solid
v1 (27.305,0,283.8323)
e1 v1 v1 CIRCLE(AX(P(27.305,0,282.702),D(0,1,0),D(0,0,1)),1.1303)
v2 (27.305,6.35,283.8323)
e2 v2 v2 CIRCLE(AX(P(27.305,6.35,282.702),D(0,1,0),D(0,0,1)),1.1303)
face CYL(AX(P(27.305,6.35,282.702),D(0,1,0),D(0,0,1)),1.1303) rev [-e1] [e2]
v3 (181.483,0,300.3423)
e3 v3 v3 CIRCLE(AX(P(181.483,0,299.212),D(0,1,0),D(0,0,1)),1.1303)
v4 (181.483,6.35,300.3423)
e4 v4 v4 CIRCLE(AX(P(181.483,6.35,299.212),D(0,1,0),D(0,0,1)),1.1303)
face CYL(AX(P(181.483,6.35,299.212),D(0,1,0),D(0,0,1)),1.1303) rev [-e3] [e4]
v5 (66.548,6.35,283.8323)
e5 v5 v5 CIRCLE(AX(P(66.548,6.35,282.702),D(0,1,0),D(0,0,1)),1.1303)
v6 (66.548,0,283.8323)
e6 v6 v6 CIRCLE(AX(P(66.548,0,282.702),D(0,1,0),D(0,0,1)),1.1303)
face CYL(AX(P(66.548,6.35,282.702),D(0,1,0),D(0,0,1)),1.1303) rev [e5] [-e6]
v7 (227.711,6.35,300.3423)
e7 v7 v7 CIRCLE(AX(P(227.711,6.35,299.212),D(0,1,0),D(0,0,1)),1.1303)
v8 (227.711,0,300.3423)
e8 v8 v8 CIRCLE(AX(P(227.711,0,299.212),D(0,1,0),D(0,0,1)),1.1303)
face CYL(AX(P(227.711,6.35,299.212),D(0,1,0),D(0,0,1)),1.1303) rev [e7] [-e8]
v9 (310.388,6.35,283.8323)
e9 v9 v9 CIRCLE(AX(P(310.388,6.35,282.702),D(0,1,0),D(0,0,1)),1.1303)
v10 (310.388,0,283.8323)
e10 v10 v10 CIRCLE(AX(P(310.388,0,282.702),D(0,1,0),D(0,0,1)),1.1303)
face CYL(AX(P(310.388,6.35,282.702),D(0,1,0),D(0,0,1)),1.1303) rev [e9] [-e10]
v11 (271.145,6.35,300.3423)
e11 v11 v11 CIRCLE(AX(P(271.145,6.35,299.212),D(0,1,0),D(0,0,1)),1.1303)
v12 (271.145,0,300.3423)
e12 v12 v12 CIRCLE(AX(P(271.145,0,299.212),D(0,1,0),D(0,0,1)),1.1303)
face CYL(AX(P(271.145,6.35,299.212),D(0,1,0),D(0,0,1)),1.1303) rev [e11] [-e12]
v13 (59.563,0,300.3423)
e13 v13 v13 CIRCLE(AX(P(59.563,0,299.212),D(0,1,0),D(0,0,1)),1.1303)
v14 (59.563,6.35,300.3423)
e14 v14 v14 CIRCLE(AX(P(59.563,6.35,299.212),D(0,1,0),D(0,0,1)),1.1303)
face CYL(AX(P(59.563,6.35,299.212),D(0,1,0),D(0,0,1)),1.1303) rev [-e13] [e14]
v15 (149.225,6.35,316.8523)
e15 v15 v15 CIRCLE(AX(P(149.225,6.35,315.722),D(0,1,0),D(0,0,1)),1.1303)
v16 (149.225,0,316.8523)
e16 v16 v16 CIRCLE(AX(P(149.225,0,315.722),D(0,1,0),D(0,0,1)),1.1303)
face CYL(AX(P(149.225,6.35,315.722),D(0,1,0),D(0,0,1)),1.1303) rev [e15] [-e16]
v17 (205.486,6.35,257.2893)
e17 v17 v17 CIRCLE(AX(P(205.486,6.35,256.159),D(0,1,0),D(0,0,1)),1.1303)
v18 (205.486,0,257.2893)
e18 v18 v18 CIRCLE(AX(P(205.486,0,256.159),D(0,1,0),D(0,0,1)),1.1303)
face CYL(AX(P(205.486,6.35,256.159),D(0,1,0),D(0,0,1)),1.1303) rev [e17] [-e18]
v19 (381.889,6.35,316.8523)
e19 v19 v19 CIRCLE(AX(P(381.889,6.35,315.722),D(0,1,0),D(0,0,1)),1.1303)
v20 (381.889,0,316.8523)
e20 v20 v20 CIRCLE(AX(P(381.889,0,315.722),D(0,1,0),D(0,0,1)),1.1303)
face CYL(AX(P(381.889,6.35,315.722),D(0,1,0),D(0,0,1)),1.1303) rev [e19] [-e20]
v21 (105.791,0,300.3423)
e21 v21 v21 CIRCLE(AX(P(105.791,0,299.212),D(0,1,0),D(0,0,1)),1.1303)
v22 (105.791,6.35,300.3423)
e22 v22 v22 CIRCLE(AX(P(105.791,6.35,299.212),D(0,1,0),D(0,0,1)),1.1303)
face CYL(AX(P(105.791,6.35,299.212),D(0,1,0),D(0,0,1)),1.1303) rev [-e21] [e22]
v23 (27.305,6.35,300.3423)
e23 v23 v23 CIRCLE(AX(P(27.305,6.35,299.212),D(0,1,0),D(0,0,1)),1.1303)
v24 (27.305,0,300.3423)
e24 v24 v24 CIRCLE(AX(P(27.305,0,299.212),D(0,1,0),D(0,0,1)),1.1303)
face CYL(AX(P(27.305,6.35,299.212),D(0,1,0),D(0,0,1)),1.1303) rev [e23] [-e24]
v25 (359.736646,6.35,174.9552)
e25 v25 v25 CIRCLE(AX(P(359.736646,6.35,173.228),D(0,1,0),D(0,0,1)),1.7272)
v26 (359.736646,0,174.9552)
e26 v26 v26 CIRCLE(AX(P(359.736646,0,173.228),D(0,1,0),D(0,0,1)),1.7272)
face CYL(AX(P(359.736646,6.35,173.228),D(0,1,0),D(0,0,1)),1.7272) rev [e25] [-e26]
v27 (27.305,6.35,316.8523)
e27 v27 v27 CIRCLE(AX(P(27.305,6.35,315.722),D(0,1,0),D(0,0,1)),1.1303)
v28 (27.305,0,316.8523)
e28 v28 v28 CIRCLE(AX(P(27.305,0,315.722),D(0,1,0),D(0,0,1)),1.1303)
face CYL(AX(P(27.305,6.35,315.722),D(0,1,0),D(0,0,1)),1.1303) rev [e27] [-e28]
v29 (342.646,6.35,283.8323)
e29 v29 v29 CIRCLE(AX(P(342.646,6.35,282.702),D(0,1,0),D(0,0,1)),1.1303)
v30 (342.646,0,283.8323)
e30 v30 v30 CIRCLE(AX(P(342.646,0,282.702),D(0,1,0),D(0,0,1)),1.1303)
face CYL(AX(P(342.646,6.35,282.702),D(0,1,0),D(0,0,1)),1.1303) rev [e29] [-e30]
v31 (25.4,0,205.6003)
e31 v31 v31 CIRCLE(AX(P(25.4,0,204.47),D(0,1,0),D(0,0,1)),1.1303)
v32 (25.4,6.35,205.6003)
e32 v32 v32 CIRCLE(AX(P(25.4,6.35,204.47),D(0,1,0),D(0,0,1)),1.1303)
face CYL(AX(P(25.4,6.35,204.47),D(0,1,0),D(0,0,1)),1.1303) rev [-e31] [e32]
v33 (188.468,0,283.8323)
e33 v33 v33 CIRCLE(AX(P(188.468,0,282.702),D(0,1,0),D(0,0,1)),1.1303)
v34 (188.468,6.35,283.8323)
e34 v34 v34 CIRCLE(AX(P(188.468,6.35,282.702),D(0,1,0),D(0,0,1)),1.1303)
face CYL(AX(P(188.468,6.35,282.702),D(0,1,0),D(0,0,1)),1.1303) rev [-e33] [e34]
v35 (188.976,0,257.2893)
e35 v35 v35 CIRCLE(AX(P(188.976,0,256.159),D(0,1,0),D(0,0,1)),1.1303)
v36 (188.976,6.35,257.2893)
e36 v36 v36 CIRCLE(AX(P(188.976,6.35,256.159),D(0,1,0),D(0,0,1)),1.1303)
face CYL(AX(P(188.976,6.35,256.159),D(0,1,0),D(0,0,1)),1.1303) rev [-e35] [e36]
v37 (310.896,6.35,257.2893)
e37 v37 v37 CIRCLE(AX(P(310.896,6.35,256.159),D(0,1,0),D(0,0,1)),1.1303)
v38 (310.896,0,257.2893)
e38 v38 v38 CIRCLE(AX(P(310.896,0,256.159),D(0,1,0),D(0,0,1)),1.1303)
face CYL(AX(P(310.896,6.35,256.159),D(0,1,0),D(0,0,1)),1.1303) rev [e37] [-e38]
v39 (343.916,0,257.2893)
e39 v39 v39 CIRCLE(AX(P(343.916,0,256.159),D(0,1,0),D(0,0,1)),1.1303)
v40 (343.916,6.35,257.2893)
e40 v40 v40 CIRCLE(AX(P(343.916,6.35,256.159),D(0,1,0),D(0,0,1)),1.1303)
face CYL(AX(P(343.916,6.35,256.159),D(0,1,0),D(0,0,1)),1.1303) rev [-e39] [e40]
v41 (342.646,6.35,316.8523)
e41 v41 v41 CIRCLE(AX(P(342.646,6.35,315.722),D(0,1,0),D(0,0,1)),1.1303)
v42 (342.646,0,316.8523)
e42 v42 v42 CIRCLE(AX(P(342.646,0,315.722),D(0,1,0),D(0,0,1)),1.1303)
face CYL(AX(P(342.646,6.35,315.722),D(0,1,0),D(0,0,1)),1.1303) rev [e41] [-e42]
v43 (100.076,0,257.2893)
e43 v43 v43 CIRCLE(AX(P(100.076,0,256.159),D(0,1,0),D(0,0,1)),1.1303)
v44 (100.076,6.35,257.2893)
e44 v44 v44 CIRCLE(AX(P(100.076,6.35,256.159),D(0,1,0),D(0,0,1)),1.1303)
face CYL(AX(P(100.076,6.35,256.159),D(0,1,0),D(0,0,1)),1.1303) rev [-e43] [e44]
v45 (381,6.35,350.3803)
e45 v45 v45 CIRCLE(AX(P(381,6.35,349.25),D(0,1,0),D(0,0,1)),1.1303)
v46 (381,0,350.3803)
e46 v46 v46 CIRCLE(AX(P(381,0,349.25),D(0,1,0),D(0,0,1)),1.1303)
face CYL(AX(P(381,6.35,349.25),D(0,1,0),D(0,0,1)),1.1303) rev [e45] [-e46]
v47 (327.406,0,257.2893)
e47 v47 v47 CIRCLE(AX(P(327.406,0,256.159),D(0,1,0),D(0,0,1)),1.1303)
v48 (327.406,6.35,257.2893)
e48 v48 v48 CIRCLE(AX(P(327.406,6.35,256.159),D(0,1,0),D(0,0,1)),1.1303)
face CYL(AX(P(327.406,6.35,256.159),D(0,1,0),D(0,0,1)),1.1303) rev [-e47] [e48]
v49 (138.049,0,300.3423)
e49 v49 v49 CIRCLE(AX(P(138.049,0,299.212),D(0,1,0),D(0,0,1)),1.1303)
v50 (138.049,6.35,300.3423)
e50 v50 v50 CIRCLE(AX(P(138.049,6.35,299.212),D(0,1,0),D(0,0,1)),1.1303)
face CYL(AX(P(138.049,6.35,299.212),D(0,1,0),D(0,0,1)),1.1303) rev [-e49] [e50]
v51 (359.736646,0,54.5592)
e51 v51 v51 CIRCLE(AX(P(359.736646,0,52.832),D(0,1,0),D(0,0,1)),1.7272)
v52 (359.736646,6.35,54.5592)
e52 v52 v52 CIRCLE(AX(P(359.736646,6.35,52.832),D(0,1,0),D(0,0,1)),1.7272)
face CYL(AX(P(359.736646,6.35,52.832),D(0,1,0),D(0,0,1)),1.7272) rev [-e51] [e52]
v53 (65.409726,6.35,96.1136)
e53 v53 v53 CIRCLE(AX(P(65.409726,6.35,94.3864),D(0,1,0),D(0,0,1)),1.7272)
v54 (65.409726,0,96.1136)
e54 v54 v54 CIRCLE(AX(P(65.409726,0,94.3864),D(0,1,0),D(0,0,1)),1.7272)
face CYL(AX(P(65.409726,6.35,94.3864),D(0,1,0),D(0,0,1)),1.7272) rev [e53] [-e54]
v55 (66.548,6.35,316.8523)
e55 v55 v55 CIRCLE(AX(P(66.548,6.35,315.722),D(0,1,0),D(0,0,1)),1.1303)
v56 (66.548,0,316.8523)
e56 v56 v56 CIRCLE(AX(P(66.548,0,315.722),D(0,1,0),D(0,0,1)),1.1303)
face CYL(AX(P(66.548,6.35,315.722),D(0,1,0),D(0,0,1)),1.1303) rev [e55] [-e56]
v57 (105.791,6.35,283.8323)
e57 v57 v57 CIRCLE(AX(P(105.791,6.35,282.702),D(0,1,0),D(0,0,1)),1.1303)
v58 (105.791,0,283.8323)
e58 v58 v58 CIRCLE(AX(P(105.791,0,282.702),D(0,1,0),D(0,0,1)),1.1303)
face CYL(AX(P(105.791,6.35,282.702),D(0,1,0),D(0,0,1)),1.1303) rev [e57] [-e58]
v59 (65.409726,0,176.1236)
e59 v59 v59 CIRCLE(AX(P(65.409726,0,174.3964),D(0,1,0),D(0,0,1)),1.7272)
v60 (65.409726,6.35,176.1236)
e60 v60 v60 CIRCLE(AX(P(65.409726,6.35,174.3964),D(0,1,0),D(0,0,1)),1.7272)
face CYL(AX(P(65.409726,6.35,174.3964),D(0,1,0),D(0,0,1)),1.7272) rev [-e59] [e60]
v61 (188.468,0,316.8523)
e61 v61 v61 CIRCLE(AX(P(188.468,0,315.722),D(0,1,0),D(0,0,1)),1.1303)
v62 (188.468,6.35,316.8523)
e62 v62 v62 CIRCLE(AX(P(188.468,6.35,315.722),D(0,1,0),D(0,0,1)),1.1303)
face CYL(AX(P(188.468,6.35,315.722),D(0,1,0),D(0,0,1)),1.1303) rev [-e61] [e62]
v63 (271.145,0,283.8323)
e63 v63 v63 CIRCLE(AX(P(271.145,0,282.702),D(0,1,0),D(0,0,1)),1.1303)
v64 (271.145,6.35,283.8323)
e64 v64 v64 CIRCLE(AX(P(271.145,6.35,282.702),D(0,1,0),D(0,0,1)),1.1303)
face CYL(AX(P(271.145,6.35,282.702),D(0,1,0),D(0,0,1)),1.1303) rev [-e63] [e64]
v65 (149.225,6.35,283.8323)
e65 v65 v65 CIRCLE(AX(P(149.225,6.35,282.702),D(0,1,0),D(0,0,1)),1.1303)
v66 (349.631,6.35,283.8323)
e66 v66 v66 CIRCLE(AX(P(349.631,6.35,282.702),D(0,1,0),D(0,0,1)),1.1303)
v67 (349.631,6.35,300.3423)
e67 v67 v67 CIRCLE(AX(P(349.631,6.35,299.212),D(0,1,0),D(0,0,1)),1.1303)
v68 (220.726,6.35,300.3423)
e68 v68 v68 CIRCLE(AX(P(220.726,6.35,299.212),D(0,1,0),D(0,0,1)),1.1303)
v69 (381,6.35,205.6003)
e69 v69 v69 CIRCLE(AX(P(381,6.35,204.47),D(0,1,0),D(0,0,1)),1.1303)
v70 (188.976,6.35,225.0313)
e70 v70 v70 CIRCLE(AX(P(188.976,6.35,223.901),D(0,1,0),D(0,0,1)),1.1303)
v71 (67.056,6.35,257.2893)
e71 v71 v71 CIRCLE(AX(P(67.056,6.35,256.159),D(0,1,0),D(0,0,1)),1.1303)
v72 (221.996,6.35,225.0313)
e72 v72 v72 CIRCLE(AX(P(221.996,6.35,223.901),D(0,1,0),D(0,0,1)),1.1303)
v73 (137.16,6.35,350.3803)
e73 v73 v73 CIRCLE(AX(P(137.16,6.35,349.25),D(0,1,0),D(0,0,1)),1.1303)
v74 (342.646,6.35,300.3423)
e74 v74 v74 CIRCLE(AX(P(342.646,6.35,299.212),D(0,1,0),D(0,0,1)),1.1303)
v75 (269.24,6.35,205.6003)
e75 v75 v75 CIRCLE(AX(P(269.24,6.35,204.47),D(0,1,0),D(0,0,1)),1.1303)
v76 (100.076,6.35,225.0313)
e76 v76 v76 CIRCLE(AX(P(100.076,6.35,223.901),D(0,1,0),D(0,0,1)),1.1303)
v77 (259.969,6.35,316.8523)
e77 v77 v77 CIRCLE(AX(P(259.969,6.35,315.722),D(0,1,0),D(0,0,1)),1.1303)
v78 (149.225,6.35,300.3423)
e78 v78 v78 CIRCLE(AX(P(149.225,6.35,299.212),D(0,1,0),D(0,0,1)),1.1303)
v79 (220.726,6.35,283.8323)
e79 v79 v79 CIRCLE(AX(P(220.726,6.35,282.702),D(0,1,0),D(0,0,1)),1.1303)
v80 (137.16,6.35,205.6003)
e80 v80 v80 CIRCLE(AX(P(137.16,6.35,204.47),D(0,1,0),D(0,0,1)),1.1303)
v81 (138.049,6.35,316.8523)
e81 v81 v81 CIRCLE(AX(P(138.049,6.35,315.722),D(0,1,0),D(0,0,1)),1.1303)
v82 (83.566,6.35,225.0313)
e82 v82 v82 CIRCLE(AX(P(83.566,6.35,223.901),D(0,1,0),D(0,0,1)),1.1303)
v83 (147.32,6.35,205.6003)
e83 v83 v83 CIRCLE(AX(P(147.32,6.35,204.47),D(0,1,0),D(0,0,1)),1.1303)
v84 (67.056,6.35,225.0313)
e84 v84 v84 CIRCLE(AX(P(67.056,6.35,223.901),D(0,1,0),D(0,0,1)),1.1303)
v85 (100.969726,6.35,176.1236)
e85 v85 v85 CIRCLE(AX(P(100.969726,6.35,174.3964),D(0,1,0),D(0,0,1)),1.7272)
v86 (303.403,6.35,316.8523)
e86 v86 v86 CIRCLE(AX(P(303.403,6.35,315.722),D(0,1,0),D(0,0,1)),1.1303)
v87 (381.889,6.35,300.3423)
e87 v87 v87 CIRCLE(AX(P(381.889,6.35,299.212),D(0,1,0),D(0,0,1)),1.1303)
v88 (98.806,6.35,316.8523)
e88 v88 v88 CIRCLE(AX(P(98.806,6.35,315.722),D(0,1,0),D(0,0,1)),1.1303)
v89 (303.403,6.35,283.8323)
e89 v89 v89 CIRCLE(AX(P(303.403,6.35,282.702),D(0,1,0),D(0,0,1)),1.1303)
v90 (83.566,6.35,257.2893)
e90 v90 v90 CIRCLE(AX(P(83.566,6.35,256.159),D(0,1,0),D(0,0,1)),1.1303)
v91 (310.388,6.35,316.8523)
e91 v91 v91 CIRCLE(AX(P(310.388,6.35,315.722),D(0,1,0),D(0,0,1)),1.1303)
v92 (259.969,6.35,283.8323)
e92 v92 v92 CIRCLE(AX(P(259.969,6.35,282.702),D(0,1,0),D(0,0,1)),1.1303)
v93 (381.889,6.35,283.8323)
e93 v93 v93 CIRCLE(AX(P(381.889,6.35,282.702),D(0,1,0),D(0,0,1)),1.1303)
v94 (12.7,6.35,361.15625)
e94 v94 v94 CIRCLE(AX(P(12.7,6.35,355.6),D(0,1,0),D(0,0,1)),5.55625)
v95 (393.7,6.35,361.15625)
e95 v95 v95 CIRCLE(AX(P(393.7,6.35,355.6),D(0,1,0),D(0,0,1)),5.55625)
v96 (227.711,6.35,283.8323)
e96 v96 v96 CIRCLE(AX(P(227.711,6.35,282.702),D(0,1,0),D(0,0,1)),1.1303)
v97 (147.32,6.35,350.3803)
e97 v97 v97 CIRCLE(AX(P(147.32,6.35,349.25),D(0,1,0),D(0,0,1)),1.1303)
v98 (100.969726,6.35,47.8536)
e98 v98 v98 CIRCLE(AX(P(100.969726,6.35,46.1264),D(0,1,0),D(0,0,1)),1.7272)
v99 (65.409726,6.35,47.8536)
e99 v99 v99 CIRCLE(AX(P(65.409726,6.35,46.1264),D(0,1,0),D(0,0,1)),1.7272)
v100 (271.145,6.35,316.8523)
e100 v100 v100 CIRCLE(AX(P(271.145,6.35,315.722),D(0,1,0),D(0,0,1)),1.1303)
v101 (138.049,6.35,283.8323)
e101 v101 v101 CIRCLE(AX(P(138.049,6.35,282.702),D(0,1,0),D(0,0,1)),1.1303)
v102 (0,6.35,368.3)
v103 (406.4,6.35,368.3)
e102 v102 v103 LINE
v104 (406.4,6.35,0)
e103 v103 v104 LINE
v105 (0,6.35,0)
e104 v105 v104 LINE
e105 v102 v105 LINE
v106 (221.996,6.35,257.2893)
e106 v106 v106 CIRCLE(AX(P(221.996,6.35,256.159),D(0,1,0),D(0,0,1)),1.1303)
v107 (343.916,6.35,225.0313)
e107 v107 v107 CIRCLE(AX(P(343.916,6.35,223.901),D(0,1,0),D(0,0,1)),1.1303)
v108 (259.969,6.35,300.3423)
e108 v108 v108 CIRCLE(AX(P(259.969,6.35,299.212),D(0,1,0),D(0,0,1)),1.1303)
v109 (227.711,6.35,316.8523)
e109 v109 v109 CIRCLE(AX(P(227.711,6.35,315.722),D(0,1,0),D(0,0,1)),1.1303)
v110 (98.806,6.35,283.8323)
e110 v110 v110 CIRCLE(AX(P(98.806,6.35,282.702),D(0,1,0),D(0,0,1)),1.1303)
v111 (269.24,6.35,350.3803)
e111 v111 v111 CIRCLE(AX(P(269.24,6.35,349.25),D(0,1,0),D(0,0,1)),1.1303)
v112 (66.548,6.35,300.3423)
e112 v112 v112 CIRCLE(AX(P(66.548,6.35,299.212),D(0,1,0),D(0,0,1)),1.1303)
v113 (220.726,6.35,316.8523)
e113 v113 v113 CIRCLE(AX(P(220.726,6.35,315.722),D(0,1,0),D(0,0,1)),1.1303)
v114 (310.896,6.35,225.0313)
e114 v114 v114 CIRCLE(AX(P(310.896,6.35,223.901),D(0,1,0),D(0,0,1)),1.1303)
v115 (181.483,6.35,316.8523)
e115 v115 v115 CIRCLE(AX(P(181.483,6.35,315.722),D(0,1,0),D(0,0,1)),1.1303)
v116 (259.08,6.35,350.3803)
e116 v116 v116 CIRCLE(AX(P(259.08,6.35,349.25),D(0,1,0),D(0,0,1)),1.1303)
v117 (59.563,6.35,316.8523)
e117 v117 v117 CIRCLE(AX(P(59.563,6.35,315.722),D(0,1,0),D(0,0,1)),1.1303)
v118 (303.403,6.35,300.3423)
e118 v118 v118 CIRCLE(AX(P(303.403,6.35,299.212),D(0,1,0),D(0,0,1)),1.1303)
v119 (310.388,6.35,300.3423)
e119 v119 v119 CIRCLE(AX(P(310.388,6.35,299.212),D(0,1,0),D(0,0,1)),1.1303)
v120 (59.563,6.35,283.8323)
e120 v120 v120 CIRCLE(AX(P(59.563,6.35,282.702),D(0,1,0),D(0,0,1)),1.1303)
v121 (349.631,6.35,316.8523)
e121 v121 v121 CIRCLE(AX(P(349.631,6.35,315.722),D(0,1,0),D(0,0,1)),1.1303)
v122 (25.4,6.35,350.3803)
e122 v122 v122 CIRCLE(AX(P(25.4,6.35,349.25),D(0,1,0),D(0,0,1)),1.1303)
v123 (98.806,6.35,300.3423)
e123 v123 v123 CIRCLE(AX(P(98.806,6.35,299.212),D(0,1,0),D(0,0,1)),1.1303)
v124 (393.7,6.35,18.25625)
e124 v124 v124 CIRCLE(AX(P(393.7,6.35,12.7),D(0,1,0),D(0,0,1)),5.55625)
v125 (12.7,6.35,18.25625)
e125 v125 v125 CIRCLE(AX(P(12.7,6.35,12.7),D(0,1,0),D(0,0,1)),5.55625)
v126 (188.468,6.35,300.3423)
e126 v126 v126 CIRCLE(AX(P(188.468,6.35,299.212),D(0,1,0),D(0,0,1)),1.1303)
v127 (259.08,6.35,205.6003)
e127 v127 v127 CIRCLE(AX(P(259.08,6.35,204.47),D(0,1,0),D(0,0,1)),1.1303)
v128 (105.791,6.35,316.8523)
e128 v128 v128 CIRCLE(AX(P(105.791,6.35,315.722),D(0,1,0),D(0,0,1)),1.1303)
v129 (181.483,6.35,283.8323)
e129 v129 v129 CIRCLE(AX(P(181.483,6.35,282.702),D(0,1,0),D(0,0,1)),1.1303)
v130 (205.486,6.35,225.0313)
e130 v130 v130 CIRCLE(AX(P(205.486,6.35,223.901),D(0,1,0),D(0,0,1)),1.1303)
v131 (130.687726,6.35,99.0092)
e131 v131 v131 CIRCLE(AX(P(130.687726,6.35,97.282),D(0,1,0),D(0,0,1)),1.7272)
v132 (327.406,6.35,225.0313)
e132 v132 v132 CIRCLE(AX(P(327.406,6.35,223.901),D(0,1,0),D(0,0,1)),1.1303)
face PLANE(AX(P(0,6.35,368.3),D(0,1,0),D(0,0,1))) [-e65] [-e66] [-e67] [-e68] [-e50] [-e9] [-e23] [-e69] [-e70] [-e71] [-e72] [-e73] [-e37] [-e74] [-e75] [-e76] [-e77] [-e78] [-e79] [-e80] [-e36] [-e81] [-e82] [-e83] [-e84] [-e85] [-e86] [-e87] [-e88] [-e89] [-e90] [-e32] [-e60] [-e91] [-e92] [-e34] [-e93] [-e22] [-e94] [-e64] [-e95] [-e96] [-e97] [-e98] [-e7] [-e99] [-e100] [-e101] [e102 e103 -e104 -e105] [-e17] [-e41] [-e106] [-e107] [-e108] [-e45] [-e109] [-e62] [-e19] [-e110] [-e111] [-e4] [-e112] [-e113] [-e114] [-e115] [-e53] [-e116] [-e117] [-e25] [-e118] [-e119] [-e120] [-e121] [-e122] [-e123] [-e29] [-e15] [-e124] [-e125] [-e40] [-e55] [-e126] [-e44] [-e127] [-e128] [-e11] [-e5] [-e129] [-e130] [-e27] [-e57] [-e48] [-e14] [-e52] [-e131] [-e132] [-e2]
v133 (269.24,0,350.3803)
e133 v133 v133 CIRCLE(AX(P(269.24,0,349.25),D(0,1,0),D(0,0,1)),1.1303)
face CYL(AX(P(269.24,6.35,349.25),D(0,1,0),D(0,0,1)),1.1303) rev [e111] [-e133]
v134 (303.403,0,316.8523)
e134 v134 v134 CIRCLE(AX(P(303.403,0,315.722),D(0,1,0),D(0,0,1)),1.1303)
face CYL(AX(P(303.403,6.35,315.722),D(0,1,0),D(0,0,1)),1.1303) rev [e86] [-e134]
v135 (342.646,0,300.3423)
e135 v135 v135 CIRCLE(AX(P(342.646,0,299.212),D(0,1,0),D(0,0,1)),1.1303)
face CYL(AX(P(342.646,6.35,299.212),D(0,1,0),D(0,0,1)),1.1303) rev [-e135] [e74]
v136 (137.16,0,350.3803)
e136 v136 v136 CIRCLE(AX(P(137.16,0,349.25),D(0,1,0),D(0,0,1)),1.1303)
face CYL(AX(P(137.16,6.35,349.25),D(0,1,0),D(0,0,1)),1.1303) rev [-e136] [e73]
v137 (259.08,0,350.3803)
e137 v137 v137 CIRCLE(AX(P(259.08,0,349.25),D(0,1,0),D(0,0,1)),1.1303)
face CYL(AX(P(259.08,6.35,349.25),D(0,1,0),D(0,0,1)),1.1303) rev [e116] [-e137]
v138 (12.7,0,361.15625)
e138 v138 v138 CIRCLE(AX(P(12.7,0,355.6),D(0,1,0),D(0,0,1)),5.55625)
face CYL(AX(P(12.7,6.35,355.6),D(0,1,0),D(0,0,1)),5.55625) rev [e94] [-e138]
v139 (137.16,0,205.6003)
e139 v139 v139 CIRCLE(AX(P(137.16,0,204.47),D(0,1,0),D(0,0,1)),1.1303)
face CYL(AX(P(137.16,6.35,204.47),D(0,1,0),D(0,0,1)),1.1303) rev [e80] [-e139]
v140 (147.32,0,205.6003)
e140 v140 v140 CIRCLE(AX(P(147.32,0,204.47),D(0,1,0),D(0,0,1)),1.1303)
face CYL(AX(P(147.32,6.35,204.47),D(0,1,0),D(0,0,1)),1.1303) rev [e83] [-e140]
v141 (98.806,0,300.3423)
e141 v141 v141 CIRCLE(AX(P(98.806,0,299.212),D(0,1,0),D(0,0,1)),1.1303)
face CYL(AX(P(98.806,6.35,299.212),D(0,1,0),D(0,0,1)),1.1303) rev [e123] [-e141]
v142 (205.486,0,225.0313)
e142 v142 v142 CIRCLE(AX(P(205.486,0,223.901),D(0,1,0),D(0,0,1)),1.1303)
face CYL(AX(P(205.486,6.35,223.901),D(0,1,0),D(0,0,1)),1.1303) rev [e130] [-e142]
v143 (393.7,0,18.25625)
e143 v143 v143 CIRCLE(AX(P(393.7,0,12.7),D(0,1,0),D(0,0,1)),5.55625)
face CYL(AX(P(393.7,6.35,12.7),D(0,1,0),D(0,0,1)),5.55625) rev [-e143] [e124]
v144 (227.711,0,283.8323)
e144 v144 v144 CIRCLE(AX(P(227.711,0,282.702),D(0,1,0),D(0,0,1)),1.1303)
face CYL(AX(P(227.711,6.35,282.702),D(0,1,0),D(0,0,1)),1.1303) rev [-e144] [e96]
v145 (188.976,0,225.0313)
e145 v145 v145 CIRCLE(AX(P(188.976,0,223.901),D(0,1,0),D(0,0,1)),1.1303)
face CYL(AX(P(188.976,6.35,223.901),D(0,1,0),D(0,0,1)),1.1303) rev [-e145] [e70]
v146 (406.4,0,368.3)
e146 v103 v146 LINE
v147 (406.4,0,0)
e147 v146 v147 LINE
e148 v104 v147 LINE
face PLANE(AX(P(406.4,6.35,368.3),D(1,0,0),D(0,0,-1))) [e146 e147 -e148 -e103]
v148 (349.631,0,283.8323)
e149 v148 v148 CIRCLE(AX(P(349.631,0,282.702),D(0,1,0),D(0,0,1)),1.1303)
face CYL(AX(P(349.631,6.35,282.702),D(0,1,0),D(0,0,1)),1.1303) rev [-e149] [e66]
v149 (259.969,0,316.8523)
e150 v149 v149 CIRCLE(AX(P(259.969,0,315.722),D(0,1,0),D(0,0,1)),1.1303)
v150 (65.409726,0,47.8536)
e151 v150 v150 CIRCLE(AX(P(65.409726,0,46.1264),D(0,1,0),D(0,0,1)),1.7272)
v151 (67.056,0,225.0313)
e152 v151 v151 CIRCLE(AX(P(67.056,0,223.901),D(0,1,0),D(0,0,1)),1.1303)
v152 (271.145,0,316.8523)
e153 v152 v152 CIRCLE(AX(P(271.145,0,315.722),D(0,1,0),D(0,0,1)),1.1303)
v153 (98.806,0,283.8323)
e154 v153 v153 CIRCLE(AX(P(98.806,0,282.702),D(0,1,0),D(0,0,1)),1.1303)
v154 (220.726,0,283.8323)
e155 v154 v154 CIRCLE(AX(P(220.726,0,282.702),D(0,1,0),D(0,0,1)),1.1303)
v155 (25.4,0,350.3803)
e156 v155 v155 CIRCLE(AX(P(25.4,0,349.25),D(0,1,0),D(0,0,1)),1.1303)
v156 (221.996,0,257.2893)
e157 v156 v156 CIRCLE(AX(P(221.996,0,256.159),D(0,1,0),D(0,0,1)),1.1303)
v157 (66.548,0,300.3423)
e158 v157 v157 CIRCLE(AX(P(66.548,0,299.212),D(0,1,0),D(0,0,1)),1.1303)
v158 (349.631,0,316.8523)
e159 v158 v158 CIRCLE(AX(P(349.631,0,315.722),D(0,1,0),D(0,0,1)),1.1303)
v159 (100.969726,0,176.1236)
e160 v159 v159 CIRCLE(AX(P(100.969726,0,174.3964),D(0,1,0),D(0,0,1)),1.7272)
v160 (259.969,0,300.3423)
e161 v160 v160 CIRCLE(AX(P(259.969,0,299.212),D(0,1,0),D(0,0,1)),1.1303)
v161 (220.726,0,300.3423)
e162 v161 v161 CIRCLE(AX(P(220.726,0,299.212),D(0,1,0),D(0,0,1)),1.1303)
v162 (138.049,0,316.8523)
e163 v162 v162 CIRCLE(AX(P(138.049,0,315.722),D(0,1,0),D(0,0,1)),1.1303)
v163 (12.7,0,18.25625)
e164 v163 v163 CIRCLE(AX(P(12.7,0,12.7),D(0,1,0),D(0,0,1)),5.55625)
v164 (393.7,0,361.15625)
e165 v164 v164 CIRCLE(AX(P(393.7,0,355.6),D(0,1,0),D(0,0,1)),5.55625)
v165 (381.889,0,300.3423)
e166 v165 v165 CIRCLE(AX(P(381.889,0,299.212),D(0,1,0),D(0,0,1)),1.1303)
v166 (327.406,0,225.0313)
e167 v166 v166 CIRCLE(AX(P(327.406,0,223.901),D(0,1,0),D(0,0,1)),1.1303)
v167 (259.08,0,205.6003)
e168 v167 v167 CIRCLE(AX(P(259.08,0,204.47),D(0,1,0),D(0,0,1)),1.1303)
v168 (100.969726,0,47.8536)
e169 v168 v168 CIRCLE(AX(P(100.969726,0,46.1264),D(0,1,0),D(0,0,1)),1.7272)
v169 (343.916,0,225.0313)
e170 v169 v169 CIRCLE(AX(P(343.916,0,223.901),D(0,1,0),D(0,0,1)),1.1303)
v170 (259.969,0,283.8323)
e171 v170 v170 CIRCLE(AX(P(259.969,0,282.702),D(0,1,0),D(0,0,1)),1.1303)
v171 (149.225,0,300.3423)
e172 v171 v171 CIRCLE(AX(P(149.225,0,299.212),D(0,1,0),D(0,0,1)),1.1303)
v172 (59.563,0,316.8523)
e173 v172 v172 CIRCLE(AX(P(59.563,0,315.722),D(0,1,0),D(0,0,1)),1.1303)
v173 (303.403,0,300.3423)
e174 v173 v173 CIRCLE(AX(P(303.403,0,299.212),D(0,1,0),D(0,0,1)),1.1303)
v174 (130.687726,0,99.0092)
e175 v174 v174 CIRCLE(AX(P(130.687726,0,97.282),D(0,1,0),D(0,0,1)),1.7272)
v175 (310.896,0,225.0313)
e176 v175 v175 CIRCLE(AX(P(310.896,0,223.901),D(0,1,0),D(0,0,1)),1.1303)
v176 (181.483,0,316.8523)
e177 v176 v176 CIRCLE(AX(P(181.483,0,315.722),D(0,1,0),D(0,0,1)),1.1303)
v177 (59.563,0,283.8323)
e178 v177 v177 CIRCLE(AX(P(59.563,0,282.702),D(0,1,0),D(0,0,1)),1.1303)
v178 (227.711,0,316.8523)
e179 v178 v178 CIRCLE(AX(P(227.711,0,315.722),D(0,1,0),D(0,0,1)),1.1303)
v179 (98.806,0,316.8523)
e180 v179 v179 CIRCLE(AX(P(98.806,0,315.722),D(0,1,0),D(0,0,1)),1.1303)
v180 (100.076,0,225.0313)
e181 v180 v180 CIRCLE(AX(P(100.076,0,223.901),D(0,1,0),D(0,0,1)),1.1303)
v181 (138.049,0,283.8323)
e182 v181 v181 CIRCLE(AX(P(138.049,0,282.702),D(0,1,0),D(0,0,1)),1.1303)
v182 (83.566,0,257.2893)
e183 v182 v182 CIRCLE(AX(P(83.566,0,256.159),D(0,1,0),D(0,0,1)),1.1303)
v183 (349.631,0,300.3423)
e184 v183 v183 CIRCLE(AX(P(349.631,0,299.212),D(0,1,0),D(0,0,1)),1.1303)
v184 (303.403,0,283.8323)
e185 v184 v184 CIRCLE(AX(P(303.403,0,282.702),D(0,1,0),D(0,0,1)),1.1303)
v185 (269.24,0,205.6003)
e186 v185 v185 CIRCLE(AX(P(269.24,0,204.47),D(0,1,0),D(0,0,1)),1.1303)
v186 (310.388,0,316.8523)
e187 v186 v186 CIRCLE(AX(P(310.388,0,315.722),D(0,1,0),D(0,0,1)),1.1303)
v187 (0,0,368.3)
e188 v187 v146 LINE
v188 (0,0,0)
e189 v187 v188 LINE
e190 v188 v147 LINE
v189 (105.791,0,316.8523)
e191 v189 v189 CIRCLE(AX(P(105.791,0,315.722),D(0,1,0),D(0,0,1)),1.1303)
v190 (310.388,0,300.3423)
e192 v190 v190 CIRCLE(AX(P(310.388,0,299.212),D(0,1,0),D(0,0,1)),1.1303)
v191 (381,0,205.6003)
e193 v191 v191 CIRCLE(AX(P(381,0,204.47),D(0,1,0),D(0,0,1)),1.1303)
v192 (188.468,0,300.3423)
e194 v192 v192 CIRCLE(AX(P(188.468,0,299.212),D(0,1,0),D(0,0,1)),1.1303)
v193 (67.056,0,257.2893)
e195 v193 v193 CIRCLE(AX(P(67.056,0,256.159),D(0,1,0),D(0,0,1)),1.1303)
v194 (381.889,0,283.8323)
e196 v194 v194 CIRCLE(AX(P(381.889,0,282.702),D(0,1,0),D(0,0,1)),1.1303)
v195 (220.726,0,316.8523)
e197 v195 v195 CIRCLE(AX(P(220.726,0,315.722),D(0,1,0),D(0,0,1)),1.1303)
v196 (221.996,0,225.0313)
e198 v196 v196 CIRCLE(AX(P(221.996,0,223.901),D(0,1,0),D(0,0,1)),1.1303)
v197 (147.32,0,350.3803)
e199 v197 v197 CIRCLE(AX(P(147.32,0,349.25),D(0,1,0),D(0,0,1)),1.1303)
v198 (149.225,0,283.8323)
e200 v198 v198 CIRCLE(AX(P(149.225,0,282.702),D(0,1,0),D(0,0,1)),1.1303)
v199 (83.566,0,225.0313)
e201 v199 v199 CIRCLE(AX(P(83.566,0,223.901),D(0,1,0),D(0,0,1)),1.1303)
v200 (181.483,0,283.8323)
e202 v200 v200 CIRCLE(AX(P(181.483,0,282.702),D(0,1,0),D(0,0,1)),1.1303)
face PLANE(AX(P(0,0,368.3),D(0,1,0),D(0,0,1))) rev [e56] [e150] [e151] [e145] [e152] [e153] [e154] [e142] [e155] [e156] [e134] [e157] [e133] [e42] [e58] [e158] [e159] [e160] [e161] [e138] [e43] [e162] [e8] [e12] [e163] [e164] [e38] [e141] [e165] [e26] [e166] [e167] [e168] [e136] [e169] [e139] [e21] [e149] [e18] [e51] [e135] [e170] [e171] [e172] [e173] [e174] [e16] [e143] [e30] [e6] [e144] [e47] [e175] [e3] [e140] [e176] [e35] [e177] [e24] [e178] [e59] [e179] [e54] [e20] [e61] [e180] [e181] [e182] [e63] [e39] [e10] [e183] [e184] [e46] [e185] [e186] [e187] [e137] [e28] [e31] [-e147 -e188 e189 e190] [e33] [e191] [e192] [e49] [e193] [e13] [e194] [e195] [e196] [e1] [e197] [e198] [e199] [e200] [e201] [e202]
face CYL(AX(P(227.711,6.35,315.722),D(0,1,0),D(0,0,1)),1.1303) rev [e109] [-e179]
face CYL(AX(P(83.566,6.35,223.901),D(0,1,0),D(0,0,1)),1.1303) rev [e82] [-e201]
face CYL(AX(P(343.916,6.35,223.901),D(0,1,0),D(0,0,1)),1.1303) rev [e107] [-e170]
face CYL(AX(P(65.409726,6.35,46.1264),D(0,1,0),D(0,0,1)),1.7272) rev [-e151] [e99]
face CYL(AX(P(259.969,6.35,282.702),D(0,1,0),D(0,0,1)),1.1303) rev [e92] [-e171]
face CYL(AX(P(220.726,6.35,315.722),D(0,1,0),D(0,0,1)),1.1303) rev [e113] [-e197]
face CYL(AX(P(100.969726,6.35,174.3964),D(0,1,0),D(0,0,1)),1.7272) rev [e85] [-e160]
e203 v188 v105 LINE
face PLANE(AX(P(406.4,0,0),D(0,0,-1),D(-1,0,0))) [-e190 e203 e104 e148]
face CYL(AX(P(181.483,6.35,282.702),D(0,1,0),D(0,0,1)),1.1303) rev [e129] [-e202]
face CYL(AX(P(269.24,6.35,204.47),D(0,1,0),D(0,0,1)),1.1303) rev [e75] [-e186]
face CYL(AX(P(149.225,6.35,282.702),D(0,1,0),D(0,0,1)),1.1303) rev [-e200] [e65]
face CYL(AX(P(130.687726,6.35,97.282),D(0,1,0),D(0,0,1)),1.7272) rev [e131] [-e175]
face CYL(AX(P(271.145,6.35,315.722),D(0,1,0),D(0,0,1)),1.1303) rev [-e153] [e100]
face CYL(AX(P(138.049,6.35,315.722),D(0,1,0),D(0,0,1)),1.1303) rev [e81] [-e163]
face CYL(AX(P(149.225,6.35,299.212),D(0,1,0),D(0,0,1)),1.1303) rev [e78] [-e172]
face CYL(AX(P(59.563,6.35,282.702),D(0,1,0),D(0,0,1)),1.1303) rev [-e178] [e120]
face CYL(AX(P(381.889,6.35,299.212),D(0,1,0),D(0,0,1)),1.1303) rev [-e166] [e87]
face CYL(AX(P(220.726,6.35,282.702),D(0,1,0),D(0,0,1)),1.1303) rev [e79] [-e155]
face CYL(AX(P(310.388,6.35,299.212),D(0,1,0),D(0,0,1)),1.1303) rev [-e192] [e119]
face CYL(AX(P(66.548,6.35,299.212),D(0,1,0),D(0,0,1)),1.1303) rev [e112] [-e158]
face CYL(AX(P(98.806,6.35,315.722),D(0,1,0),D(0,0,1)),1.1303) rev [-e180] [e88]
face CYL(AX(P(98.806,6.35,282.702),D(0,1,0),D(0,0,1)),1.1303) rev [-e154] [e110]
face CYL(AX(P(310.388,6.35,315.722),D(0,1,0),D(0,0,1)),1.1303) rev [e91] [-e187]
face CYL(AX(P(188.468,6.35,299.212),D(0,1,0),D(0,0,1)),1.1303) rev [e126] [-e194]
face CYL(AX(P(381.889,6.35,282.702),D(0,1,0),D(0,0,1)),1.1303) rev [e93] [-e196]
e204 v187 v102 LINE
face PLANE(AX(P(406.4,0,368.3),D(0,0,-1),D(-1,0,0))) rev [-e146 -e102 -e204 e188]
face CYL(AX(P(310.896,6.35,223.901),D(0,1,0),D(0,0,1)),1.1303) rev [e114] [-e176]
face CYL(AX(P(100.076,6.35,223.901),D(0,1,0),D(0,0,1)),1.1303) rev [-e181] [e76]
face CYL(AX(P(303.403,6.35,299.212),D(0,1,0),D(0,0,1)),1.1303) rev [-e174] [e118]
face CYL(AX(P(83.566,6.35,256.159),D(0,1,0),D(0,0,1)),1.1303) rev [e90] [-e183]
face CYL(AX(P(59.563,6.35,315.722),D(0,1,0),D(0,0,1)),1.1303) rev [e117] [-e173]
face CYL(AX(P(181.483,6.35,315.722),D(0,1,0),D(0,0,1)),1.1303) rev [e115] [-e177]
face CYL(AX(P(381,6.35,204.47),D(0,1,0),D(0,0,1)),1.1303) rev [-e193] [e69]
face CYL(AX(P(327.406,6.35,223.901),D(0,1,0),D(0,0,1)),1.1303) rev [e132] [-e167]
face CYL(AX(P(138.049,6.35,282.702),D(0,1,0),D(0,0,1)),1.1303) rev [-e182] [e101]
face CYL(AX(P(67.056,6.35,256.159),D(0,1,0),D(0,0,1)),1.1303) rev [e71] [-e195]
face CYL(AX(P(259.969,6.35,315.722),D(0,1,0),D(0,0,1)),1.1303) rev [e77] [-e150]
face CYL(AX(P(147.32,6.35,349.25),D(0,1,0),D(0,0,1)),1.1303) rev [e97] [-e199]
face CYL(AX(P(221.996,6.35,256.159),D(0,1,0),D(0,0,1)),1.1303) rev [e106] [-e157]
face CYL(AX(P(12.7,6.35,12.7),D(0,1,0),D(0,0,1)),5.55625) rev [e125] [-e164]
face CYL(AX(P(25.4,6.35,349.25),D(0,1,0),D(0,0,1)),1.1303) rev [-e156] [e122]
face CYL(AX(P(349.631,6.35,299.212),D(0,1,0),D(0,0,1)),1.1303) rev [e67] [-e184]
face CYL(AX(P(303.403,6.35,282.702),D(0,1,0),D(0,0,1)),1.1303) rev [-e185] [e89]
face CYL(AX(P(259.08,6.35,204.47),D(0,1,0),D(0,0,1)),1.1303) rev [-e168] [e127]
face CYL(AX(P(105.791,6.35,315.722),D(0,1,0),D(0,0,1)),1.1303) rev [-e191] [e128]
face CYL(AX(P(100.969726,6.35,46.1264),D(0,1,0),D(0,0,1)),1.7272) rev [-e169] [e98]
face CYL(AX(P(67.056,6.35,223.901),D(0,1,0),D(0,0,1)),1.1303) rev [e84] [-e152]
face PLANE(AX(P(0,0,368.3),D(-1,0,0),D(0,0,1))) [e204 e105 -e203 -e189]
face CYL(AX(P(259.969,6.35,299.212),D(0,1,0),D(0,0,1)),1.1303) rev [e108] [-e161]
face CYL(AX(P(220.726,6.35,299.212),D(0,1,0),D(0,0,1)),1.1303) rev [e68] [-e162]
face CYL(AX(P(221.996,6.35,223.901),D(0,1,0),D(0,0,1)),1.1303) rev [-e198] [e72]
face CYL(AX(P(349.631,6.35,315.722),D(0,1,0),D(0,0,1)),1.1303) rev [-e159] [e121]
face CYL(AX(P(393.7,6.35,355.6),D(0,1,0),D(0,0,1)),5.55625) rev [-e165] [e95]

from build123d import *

# Parameters (mm, degrees)
SKETCH1_W                      = 406.4
SKETCH1_H                      = 6.35
BASE_FLANGE3_DEPTH             = 368.3
F_7_16_0_4375_DIAMETER_HOLE1_D = 11.1125
F_4_40_TAPPED_HOLE2_D          = 2.2606
LPATTERN1_COUNT                = 3
LPATTERN1_PITCH                = 16.51
F_4_40_TAPPED_HOLE3_D          = 2.2606
LPATTERN2_COUNT                = 3
LPATTERN2_PITCH                = 16.51
LPATTERN2_COUNT_DIR2           = 2
LPATTERN2_PITCH_DIR2           = 32.258
F_4_40_TAPPED_HOLE1_D          = 2.2606
LPATTERN3_COUNT                = 2
LPATTERN3_PITCH                = 111.76
LPATTERN3_COUNT_DIR2           = 2
LPATTERN3_PITCH_DIR2           = 144.78
F_8_32_TAPPED_HOLE2_D          = 3.4544
F_8_32_TAPPED_HOLE1_D          = 3.4544


# Sheet-metal steps are written as plain solids
with BuildPart() as part:
    # Sketch1 → Base-Flange3 (new body)
    with BuildSketch(Plane.XY):
        with Locations((203.2, 3.175)):
            Rectangle(SKETCH1_W, SKETCH1_H)
    extrude(amount=BASE_FLANGE3_DEPTH)

    # 7/16 (0.4375) Diameter Hole1 (through all)
    with Locations(Plane(origin=(0, 6.35, 0), x_dir=(1, 0, 0), z_dir=(0, 1, 0))):
        with Locations((12.7, -355.6), (393.7, -355.6), (393.7, -12.7), (12.7, -12.7)):
            Hole(F_7_16_0_4375_DIAMETER_HOLE1_D / 2)

    # #4-40 Tapped Hole2 (through all)
    with Locations(Plane(origin=(0, 6.35, 0), x_dir=(1, 0, 0), z_dir=(0, 1, 0))):
        with Locations((27.305, -282.702), (59.563, -282.702), (66.548, -282.702), (98.806, -282.702), (105.791, -282.702), (138.049, -282.702), (149.225, -282.702), (181.483, -282.702), (188.468, -282.702), (220.726, -282.702), (227.711, -282.702), (259.969, -282.702), (271.145, -282.702), (303.403, -282.702), (310.388, -282.702), (342.646, -282.702), (349.631, -282.702), (381.889, -282.702)):
            f_4_40_tapped_hole2 = Hole(F_4_40_TAPPED_HOLE2_D / 2)

    # LPattern1: #4-40 Tapped Hole2 ×3
    with Locations(*[(0, 0, i * LPATTERN1_PITCH) for i in range(1, LPATTERN1_COUNT)]):
        add(f_4_40_tapped_hole2, mode=Mode.SUBTRACT)

    # #4-40 Tapped Hole3 (through all)
    with Locations(Plane(origin=(0, 6.35, 0), x_dir=(1, 0, 0), z_dir=(0, 1, 0))):
        with Locations((67.056, -223.901), (188.976, -223.901), (310.896, -223.901)):
            f_4_40_tapped_hole3 = Hole(F_4_40_TAPPED_HOLE3_D / 2)

    # LPattern2: 4-40 Tapped Hole3 3 × 2
    with Locations(*[(i * LPATTERN2_PITCH, 0, j * LPATTERN2_PITCH_DIR2) for i in range(LPATTERN2_COUNT) for j in range(LPATTERN2_COUNT_DIR2) if (i, j) != (0, 0)]):
        add(f_4_40_tapped_hole3, mode=Mode.SUBTRACT)

    # #4-40 Tapped Hole1 (through all)
    with Locations(Plane(origin=(0, 6.35, 0), x_dir=(1, 0, 0), z_dir=(0, 1, 0))):
        with Locations((381, -349.25), (259.08, -349.25), (137.16, -349.25)):
            f_4_40_tapped_hole1 = Hole(F_4_40_TAPPED_HOLE1_D / 2)

    # LPattern3: 4-40 Tapped Hole1 2 × 2
    with Locations(*[(-i * LPATTERN3_PITCH, 0, -j * LPATTERN3_PITCH_DIR2) for i in range(LPATTERN3_COUNT) for j in range(LPATTERN3_COUNT_DIR2) if (i, j) != (0, 0)]):
        add(f_4_40_tapped_hole1, mode=Mode.SUBTRACT)

    # #8-32 Tapped Hole2 (through all)
    with Locations(Plane(origin=(0, 6.35, 0), x_dir=(1, 0, 0), z_dir=(0, 1, 0))):
        with Locations((359.736646422, -173.228), (359.736646422, -52.832), (130.687725552, -97.282)):
            Hole(F_8_32_TAPPED_HOLE2_D / 2)

    # #8-32 Tapped Hole1 (through all)
    with Locations(Plane(origin=(0, 6.35, 0), x_dir=(1, 0, 0), z_dir=(0, 1, 0))):
        with Locations((65.409725552, -46.1264), (100.969725552, -46.1264), (100.969725552, -174.3964), (65.409725552, -174.3964), (65.409725552, -94.3864)):
            Hole(F_8_32_TAPPED_HOLE1_D / 2)


solid = part.part
